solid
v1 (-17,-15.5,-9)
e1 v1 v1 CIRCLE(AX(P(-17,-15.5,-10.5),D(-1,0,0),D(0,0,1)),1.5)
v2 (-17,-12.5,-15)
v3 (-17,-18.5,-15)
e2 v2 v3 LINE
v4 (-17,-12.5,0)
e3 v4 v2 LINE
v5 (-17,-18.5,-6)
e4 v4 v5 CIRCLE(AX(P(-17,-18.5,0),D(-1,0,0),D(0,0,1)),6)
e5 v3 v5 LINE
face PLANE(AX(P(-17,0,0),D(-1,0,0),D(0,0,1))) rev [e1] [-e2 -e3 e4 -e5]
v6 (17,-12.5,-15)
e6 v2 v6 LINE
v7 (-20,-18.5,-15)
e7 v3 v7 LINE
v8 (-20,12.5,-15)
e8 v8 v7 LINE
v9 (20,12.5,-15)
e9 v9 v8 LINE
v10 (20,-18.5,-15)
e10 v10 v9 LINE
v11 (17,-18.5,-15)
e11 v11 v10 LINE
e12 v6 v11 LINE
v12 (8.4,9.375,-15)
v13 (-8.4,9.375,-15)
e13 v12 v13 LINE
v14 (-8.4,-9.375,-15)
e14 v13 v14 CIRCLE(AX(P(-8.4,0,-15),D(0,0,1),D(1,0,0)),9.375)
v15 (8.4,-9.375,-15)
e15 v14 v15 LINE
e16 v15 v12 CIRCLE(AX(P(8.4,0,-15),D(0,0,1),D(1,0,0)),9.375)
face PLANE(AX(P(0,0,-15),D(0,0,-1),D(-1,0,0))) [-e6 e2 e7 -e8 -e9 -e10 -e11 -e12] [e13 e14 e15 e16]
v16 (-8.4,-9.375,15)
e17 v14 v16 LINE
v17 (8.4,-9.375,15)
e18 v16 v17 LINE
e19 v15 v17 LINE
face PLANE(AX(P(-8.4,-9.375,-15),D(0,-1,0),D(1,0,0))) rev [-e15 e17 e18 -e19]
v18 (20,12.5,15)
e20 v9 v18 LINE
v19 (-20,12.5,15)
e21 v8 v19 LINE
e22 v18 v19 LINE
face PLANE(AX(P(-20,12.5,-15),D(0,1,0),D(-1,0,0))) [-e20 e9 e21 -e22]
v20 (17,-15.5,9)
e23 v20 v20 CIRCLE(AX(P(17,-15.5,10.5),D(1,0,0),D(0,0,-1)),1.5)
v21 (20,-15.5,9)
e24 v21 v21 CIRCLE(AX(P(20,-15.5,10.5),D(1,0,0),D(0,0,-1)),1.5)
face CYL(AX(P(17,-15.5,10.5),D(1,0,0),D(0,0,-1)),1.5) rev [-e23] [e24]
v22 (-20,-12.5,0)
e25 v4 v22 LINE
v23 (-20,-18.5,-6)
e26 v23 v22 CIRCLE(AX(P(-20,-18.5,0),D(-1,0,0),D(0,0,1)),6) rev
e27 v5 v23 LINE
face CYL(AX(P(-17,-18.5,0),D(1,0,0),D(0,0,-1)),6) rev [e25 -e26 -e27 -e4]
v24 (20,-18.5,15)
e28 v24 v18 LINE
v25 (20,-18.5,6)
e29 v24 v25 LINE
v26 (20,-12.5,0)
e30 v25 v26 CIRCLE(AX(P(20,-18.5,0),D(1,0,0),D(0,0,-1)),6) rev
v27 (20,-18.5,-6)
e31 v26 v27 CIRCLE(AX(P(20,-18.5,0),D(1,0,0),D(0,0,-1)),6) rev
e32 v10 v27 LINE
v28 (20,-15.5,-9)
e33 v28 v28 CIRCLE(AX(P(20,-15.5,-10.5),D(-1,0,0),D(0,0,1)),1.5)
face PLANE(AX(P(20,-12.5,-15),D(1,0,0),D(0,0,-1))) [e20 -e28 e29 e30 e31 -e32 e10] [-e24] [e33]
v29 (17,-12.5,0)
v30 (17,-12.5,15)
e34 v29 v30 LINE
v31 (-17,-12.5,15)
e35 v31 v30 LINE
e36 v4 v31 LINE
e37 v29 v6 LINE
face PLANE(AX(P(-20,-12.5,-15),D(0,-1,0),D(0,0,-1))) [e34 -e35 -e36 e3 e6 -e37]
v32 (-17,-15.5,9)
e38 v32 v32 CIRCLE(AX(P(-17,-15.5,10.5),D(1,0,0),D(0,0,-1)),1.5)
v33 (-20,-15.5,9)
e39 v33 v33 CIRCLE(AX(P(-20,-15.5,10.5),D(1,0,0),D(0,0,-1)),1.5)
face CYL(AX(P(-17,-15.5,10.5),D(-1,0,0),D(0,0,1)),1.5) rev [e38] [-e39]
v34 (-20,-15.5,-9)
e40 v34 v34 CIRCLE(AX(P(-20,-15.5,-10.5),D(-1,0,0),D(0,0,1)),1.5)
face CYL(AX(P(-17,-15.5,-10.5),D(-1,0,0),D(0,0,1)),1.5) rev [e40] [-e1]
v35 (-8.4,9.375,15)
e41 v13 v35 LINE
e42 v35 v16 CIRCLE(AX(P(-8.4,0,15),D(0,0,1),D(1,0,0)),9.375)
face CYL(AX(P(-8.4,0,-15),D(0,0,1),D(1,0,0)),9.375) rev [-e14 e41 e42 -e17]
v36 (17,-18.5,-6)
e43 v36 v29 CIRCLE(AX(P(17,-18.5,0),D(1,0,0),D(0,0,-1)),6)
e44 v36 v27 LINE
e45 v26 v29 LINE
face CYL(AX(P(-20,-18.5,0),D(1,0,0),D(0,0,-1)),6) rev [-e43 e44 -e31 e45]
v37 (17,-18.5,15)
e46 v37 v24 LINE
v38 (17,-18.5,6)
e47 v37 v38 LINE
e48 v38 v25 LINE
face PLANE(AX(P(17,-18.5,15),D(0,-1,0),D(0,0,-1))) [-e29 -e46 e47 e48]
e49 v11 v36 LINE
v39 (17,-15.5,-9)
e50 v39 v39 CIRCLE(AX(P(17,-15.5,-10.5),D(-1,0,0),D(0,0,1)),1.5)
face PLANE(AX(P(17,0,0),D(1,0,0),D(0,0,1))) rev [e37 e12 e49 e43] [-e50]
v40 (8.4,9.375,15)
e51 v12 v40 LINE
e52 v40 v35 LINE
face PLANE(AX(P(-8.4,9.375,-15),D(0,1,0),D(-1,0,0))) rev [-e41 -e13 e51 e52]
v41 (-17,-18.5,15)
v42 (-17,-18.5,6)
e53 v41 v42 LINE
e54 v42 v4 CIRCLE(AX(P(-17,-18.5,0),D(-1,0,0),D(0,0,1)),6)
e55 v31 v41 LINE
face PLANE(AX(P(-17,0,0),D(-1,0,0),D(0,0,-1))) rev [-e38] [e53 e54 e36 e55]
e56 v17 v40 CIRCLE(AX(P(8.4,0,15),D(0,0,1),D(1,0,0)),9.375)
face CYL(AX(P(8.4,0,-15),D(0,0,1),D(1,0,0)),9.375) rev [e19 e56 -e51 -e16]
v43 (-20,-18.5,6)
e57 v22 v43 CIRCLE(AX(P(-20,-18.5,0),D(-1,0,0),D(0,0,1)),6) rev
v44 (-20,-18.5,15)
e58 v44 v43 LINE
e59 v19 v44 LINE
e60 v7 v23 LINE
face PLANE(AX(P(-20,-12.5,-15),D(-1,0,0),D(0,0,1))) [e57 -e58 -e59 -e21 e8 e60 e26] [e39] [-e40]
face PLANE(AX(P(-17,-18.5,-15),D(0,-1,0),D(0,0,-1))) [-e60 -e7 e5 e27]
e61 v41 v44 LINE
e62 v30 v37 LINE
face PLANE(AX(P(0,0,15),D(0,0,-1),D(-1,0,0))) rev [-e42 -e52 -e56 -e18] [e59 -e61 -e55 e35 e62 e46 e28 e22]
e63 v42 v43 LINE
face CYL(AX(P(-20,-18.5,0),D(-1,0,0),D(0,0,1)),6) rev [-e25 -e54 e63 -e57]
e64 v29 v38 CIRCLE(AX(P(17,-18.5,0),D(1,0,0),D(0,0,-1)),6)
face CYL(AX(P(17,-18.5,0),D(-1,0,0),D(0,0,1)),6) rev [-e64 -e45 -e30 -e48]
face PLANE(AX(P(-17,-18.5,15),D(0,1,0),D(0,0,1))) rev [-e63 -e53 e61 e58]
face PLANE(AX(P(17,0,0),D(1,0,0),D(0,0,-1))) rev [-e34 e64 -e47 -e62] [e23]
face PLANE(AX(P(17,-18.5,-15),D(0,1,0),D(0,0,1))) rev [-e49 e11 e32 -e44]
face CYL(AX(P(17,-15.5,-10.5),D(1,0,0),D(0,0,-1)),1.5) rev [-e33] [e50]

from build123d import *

# Parameters (mm, degrees)
BOSS_EXTRUDE1_DEPTH      = 15
BOSS_EXTRUDE1_DEPTH_BACK = 15
SKETCH1_W                = 40
SKETCH1_H                = 25
SKETCH2_W                = 9
SKETCH2_H                = 6
SKETCH2_R                = 1.5
BOSS_EXTRUDE2_DEPTH      = 3
MIRROR3_COPY_1_SKETCH_W  = 9
MIRROR3_COPY_1_SKETCH_H  = 6
MIRROR3_COPY_1_SKETCH_R  = 1.5
MIRROR3_COPY_1_DEPTH     = 3
FILLET1_R                = 6


with BuildPart() as part:
    # Sketch1 → Boss-Extrude1 (new, two sides: drawn at the far end of the back side and taken through both)
    with BuildSketch(Plane.XY.offset(-BOSS_EXTRUDE1_DEPTH_BACK)):
        Rectangle(SKETCH1_W, SKETCH1_H)
        with BuildLine():
            Line((-8.4, 9.375), (8.4, 9.375))
            ThreePointArc((8.4, 9.375), (17.775, 0), (8.4, -9.375))
            Line((8.4, -9.375), (-8.4, -9.375))
            ThreePointArc((-8.4, -9.375), (-17.775, 0), (-8.4, 9.375))
        make_face(mode=Mode.SUBTRACT)
    extrude(amount=BOSS_EXTRUDE1_DEPTH + BOSS_EXTRUDE1_DEPTH_BACK)

    # Sketch2 → Boss-Extrude2 (add)
    with BuildSketch(Plane(origin=(20, 0, 0), x_dir=(0, 0, -1), z_dir=(1, 0, 0))):
        with Locations((-10.5, -15.5)):
            Rectangle(SKETCH2_W, SKETCH2_H)
        with Locations((-10.5, -15.5)):
            Circle(SKETCH2_R, mode=Mode.SUBTRACT)
    boss_extrude2 = extrude(amount=-BOSS_EXTRUDE2_DEPTH)

    # Mirror1: Boss-Extrude2 across plane
    add(boss_extrude2.mirror(Plane.XY))

    # Mirror3: Boss-Extrude2 across plane
    add(boss_extrude2.mirror(Plane(origin=(0, 0, 0), x_dir=(0, 0, 1), z_dir=(1, 0, 0))))

    # Mirror3 copy 1 sketch → Mirror3 copy 1 (add)
    with BuildSketch(Plane.ZY.offset(20)):
        with Locations((-10.5, -15.5)):
            Rectangle(MIRROR3_COPY_1_SKETCH_W, MIRROR3_COPY_1_SKETCH_H)
        with Locations((-10.5, -15.5)):
            Circle(MIRROR3_COPY_1_SKETCH_R, mode=Mode.SUBTRACT)
    extrude(amount=-MIRROR3_COPY_1_DEPTH)

    # Fillet1
    fillet1_edges = [part.edges().sort_by_distance(p)[0] for p in [
        (-18.5, -12.5, -6),
        (-18.5, -12.5, 6),
        (18.5, -12.5, -6),
        (18.5, -12.5, 6),
    ]]
    fillet(fillet1_edges, radius=FILLET1_R - 0.0001)  # a hair under: the kernel refuses the full size


solid = part.part
